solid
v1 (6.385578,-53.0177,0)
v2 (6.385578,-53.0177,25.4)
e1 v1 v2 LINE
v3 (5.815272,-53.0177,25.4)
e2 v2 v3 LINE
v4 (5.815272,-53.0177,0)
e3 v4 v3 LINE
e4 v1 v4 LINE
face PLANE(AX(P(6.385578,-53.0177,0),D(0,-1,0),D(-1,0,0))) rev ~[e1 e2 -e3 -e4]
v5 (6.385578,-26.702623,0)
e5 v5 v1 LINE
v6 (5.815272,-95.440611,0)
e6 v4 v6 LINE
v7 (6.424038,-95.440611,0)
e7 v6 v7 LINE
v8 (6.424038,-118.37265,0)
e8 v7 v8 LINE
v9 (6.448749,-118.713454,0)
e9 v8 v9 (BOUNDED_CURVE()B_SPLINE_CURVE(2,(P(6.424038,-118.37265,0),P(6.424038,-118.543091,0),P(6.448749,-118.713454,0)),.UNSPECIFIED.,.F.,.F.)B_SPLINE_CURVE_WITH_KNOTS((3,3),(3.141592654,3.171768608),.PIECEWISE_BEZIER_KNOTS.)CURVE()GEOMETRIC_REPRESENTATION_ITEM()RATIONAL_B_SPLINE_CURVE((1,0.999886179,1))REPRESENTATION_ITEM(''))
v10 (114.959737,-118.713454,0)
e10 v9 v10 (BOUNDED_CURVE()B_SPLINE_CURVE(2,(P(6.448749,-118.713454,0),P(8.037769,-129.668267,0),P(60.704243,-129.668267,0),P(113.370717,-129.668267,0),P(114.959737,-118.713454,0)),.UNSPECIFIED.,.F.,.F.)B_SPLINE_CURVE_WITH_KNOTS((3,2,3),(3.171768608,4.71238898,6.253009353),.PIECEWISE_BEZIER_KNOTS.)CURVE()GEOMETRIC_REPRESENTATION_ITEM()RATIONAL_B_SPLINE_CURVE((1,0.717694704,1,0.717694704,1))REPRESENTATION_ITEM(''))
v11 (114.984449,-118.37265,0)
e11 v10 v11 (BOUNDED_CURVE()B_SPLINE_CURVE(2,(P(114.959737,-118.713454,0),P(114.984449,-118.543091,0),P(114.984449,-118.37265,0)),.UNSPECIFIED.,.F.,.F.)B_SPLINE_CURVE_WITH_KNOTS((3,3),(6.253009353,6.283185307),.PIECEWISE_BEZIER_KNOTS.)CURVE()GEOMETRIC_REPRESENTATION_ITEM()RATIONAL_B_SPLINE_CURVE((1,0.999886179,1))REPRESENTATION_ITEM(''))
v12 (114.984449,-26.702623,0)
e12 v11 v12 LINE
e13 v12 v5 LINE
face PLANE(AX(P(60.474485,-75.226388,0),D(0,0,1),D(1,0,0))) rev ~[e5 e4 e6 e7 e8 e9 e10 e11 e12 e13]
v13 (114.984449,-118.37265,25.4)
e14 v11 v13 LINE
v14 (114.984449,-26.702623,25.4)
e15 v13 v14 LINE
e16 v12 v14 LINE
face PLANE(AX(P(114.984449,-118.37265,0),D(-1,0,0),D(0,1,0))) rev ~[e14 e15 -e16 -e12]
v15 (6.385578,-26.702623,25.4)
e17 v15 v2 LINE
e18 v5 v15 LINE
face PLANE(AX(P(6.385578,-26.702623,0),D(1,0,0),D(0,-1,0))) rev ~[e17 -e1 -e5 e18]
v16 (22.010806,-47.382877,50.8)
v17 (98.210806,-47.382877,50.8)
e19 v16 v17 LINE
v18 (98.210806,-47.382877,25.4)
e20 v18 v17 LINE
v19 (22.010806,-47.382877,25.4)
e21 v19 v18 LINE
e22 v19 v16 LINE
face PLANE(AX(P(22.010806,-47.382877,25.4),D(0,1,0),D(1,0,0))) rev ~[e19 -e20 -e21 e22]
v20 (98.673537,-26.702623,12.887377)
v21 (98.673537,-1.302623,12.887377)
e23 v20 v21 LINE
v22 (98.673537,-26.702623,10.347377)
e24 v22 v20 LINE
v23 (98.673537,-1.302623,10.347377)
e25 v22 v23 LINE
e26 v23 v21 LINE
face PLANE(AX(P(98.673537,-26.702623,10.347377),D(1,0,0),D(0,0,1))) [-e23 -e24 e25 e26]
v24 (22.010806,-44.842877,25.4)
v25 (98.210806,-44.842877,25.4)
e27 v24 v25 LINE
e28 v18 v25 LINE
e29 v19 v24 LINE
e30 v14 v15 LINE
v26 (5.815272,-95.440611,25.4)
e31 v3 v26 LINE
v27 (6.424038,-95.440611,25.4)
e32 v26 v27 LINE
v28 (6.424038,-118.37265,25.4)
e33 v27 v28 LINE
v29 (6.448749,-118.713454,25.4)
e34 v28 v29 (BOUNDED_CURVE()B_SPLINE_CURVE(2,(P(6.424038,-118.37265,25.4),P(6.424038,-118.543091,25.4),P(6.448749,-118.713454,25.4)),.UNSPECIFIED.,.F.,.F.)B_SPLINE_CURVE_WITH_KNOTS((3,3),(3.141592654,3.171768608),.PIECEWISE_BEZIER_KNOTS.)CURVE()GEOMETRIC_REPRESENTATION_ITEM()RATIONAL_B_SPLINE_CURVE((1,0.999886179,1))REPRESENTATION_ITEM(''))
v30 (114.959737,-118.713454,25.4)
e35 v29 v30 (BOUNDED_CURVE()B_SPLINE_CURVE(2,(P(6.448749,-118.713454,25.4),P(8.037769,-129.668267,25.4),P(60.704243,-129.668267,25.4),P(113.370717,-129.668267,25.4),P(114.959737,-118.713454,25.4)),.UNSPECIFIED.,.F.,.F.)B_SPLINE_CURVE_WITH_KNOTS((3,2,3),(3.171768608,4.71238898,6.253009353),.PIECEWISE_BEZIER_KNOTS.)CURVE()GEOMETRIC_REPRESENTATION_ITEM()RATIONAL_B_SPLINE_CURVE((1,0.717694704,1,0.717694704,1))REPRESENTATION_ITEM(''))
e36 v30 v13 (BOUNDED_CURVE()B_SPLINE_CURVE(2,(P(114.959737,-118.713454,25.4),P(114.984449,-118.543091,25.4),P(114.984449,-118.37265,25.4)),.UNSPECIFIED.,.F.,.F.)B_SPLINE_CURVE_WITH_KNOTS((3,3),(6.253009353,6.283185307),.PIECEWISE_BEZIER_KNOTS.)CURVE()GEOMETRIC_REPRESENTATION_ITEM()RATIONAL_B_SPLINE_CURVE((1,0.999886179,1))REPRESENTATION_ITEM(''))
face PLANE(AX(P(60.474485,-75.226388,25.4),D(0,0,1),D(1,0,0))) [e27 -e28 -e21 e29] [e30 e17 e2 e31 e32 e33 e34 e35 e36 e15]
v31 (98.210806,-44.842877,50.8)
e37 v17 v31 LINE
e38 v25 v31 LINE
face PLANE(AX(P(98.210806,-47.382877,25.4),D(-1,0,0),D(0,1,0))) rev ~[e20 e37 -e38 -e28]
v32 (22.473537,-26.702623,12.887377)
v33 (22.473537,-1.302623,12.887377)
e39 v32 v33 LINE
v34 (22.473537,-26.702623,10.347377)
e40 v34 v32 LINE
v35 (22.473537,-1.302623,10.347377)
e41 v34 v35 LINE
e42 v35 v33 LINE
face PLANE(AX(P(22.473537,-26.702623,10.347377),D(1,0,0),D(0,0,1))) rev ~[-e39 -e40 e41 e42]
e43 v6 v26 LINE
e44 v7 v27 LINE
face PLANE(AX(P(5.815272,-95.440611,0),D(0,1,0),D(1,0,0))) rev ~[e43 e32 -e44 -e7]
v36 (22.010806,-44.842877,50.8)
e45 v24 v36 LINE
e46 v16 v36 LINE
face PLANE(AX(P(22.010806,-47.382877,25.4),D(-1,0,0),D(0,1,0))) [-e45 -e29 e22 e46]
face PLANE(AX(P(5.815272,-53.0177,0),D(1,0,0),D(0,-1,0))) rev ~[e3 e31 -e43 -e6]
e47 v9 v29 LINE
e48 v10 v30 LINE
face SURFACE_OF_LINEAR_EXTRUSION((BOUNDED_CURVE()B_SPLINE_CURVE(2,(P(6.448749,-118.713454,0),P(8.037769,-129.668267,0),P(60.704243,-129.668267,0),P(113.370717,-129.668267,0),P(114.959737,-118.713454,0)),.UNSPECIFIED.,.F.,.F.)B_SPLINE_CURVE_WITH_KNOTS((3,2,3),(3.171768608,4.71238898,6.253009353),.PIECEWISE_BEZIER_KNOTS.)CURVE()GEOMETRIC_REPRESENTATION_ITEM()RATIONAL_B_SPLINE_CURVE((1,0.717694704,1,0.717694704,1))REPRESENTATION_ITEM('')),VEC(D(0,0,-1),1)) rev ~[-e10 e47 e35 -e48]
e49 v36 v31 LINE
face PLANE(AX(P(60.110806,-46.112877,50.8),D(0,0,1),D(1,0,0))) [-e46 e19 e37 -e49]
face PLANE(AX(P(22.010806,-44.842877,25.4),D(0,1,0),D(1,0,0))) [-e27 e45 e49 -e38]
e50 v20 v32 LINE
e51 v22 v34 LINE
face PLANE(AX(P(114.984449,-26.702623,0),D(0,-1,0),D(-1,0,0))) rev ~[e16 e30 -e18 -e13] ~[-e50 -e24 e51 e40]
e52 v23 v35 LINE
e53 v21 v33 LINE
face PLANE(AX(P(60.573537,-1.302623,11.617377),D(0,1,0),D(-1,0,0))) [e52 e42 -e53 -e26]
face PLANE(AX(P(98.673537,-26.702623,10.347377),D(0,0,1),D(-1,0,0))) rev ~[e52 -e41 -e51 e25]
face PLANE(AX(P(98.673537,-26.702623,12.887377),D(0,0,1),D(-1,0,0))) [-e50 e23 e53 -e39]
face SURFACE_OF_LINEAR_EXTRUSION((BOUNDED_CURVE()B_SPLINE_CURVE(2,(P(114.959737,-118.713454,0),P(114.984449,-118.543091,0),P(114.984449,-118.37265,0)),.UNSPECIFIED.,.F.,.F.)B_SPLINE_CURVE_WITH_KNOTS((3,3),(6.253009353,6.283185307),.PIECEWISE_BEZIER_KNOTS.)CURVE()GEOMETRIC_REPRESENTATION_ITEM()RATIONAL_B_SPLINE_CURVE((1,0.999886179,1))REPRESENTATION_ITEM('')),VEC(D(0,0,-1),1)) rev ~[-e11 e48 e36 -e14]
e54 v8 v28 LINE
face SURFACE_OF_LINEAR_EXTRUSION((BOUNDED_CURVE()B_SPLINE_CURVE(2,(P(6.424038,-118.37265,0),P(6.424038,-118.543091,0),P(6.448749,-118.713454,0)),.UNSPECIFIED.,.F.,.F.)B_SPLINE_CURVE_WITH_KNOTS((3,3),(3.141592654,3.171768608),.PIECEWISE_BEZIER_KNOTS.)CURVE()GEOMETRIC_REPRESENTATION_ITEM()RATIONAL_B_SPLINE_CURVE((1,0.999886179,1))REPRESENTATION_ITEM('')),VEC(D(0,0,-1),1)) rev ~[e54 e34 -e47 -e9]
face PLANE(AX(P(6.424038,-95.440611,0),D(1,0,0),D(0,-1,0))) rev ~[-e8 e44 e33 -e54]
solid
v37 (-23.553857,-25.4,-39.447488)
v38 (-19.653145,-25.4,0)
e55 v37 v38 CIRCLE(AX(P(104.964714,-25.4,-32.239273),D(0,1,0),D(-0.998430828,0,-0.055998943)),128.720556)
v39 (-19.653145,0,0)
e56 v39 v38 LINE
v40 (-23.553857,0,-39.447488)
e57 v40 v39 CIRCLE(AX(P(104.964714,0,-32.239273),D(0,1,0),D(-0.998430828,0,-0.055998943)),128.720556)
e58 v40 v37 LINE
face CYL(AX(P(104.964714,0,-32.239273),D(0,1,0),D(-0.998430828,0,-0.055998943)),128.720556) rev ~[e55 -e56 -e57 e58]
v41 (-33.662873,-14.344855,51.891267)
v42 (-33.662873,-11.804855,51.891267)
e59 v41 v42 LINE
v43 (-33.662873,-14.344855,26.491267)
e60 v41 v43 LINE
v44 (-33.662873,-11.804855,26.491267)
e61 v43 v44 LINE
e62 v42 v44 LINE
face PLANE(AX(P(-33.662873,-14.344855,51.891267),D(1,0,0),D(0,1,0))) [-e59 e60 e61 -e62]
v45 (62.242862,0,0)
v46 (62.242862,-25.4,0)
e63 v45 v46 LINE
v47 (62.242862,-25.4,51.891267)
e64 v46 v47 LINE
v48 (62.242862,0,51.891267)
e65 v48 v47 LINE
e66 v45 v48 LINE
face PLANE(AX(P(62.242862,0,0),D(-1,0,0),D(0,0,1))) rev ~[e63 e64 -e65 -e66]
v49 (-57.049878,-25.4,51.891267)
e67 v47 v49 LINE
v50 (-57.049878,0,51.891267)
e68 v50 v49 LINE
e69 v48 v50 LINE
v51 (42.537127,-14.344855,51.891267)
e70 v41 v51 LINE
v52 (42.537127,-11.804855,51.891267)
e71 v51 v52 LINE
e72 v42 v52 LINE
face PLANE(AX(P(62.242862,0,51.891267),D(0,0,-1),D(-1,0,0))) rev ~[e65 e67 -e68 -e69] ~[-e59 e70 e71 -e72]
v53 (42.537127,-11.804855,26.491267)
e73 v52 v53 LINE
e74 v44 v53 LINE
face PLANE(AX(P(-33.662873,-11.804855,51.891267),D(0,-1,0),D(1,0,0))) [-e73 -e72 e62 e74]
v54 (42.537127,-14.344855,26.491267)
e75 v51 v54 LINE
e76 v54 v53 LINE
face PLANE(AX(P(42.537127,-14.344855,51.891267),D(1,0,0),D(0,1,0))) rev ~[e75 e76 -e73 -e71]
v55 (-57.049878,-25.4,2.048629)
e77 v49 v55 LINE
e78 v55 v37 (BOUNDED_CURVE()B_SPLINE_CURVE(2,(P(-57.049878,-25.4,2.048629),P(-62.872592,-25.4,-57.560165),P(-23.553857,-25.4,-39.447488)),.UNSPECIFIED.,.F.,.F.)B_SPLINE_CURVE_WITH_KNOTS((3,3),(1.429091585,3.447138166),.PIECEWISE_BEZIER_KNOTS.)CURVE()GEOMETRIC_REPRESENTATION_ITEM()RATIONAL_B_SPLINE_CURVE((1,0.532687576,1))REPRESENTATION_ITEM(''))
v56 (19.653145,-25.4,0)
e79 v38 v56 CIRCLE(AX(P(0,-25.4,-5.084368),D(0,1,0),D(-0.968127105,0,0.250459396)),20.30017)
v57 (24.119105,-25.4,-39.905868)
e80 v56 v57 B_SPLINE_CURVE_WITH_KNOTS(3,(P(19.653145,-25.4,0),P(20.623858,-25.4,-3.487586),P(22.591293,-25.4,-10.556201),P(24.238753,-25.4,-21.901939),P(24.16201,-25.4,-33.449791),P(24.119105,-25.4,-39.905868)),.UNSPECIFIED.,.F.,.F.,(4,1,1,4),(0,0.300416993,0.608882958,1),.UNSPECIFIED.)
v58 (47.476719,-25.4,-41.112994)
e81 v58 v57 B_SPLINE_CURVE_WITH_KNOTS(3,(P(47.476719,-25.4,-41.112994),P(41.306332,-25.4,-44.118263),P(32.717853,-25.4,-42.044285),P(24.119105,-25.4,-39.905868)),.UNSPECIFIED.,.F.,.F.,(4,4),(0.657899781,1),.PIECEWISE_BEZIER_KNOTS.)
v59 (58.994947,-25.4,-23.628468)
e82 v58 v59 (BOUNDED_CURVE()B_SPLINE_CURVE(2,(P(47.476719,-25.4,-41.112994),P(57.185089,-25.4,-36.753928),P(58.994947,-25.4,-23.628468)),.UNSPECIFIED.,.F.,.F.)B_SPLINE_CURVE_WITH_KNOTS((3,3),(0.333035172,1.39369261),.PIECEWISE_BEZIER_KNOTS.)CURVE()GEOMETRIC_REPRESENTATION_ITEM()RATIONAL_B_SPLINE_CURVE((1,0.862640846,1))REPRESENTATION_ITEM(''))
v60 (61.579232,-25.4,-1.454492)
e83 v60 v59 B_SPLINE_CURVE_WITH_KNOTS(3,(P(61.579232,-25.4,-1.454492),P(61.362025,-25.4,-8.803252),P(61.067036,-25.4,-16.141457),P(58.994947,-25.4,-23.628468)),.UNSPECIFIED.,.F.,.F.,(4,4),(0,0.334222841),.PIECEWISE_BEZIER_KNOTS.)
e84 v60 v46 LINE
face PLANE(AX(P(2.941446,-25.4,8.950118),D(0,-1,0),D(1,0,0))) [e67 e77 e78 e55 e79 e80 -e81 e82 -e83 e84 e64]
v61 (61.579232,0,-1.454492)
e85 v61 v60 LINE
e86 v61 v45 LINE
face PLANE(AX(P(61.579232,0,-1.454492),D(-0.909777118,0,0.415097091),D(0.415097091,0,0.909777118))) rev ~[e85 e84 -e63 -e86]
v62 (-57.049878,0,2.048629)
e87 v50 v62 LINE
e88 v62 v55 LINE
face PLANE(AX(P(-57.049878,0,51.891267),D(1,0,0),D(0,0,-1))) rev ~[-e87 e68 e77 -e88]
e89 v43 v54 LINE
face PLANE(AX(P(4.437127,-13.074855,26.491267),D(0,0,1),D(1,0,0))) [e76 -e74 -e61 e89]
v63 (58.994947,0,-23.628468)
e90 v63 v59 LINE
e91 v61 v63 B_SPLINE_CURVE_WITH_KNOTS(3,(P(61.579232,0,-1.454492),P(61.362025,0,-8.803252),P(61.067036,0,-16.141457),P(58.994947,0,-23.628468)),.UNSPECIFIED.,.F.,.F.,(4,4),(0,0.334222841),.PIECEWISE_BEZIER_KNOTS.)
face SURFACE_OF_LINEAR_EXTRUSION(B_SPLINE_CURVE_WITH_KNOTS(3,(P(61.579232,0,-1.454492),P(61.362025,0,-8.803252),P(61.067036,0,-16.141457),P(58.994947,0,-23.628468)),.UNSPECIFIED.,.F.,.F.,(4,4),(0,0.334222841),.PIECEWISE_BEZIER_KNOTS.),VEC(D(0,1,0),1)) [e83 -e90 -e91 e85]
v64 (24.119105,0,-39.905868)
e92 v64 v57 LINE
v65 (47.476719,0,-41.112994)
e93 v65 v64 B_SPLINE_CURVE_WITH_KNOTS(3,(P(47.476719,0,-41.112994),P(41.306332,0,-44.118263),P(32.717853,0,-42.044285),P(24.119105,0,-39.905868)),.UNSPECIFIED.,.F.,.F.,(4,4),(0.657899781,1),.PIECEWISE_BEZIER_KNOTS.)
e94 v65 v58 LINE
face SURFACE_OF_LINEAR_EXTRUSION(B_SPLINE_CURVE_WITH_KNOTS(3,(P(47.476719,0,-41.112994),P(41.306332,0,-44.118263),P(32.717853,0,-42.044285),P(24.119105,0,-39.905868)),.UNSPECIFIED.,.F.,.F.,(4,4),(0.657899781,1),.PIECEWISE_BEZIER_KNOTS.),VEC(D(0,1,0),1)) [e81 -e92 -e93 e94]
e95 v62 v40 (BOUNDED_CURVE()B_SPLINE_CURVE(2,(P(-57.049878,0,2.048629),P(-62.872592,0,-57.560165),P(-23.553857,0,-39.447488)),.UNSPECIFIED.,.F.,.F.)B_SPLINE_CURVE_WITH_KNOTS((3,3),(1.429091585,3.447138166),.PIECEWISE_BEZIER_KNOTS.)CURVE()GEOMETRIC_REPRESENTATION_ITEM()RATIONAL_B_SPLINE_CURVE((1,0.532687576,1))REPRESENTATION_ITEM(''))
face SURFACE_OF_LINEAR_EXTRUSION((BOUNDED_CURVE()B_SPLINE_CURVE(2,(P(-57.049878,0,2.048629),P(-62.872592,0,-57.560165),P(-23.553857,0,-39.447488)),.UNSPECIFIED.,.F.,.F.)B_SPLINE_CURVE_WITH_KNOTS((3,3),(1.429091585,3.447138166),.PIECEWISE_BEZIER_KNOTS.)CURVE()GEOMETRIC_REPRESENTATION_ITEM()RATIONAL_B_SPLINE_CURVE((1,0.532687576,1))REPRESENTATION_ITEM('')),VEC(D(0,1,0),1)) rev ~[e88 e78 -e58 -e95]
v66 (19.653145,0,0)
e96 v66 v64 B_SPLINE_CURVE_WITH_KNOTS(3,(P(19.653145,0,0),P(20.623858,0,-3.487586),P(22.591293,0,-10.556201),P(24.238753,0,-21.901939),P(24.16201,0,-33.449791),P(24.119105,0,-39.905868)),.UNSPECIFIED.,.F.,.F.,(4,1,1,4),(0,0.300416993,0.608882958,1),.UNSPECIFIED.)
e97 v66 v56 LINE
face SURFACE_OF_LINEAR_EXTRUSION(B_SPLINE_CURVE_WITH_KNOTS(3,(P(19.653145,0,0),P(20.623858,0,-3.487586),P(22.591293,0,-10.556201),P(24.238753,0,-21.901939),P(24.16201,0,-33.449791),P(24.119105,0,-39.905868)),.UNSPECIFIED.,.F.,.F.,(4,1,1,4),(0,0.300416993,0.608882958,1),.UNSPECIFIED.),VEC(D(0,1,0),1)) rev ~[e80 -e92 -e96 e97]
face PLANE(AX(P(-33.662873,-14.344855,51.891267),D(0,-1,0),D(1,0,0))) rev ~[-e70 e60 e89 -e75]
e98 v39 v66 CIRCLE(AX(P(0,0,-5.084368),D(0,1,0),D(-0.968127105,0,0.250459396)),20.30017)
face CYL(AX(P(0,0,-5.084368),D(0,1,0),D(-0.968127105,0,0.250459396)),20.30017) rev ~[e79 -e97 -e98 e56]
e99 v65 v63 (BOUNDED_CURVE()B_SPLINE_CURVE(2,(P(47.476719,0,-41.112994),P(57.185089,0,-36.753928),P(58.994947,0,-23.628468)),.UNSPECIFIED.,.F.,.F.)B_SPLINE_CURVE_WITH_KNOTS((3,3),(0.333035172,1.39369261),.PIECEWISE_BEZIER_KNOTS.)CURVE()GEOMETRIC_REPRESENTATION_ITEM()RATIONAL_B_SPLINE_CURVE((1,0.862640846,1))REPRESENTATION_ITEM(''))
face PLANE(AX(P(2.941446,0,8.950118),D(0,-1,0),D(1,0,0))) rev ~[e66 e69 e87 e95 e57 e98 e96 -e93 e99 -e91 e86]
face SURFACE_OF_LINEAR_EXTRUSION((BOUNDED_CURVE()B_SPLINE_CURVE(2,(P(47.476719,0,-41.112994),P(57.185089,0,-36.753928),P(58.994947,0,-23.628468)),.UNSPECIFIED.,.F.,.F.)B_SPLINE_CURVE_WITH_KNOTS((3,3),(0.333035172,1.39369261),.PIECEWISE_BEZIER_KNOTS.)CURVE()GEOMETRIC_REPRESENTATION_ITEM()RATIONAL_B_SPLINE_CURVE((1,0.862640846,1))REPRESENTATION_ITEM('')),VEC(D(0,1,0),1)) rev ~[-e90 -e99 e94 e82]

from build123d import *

# Parameters (mm, degrees)
F1_DEPTH = 25.4
F2_W     = 76.2
F2_H     = 2.54
F3_DEPTH = 25.4
F5_DEPTH = 25.4
F6_W     = 76.2
F6_H     = 2.54
F7_DEPTH = 25.4
F8_W     = 76.2
F8_H     = 2.54
F9_DEPTH = 25.4


with BuildPart() as f1:
    # F0 (on Front) → F1 (new body)
    with BuildSketch(Plane.XZ):
        with BuildLine():
            Line((62.2428618371, 51.8912672997), (-57.0498779416, 51.8912672997))
            Line((-57.0498779416, 51.8912672997), (-57.0498779416, 2.0486290034))
            add(Edge.make_bspline(
                [(-57.0498779416, 2.0486290034), (-62.8725917554, -57.5601651506), (-23.5538572735, -39.4474879084)],
                knots=[1.4290915848, 1.4290915848, 1.4290915848, 3.4471381657, 3.4471381657, 3.4471381657], degree=2, weights=[1, 0.5326875763, 1]))
            ThreePointArc((-23.5538572735, -39.4474879084), (-23.1311062984, -19.5726887681), (-19.6531451654, 0))
            ThreePointArc((-19.6531451654, 0), (0, 15.2158019665), (19.6531451654, 0))
            add(Edge.make_bspline(
                [(19.6531451654, 0), (20.6238584336, -3.4875863708), (22.5912929652, -10.5562008448), (24.2387527598, -21.9019388925), (24.1620099315, -33.4497913044), (24.11910519, -39.9058684707)],
                knots=[0, 0, 0, 0, 0.3004169931, 0.608882958, 1, 1, 1, 1], degree=3))
            add(Edge.make_bspline(
                [(47.476719356, -41.1129942258), (41.3063324166, -44.1182628579), (32.717853118, -42.0442846037), (24.11910519, -39.9058684707)],
                knots=[0.6578997811, 0.6578997811, 0.6578997811, 0.6578997811, 1, 1, 1, 1], degree=3))
            add(Edge.make_bspline(
                [(58.9949473098, -23.6284681863), (56.9882398729, -30.879237475), (53.3148096325, -38.2695696963), (47.476719356, -41.1129942258)],
                knots=[0.3342228414, 0.3342228414, 0.3342228414, 0.3342228414, 0.6578997811, 0.6578997811, 0.6578997811, 0.6578997811], degree=3))
            add(Edge.make_bspline(
                [(61.5792318695, -1.454491908), (61.36202452, -8.8032522142), (61.0670364179, -16.1414574779), (58.9949473098, -23.6284681863)],
                knots=[0, 0, 0, 0, 0.3342228414, 0.3342228414, 0.3342228414, 0.3342228414], degree=3))
            Line((61.5792318695, -1.454491908), (62.2428618371, 0))
            Line((62.2428618371, 0), (62.2428618371, 51.8912672997))
        make_face()
        with BuildLine():
            add(Edge.make_bspline(
                [(47.476719356, -41.1129942258), (57.185089489, -36.7539276341), (58.9949473098, -23.6284681863)],
                knots=[0.3330351725, 0.3330351725, 0.3330351725, 1.3936926102, 1.3936926102, 1.3936926102], degree=2, weights=[1, 0.8626408456, 1]))
            add(Edge.make_bspline(
                [(58.9949473098, -23.6284681863), (56.9882398729, -30.879237475), (53.3148096325, -38.2695696963), (47.476719356, -41.1129942258)],
                knots=[0.3342228414, 0.3342228414, 0.3342228414, 0.3342228414, 0.6578997811, 0.6578997811, 0.6578997811, 0.6578997811], degree=3))
        make_face()
    extrude(amount=F1_DEPTH)

    # F2 (on face) → F3 (cut)
    with BuildSketch(Plane.XY.offset(51.8912672997)):
        with Locations((4.4371271506, -13.0748547494)):
            Rectangle(F2_W, F2_H)
    extrude(amount=-F3_DEPTH, mode=Mode.SUBTRACT)


with BuildPart() as f5:
    # F4 (on Top) → F5 (new body)
    with BuildSketch(Plane.XY):
        with BuildLine():
            Line((6.4240375055, -95.4406112065), (6.4240375055, -118.3726499874))
            add(Edge.make_bspline(
                [(6.4240375055, -118.3726499874), (6.4240375055, -118.5430909379), (6.4487490888, -118.7134542936)],
                knots=[3.1415926536, 3.1415926536, 3.1415926536, 3.1717686083, 3.1717686083, 3.1717686083], degree=2, weights=[1, 0.9998861786, 1]))
            add(Edge.make_bspline(
                [(6.4487490888, -118.7134542936), (8.0377690426, -129.6682672247), (60.7042431856, -129.6682672247), (113.3707173286, -129.6682672247), (114.9597372824, -118.7134542936)],
                knots=[3.1717686083, 3.1717686083, 3.1717686083, 4.7123889804, 4.7123889804, 6.2530093525, 6.2530093525, 6.2530093525], degree=2, weights=[1, 0.7176947036, 1, 0.7176947036, 1]))
            add(Edge.make_bspline(
                [(114.9597372824, -118.7134542936), (114.9844488657, -118.5430909379), (114.9844488657, -118.3726499874)],
                knots=[6.2530093525, 6.2530093525, 6.2530093525, 6.2831853072, 6.2831853072, 6.2831853072], degree=2, weights=[1, 0.9998861786, 1]))
            Line((114.9844488657, -118.3726499874), (114.9844488657, -95.4406112065))
            Line((114.9844488657, -95.4406112065), (114.9844488657, -53.0177001276))
            Line((114.9844488657, -53.0177001276), (114.9844488657, -26.7026225953))
            Line((114.9844488657, -26.7026225953), (6.38557814, -26.7026225953))
            Line((6.38557814, -26.7026225953), (6.38557814, -53.0177001276))
            Line((6.38557814, -53.0177001276), (5.8152723915, -53.0177001276))
            Line((5.8152723915, -53.0177001276), (5.8152723915, -95.4406112065))
            Line((5.8152723915, -95.4406112065), (6.4240375055, -95.4406112065))
        make_face()
    extrude(amount=F5_DEPTH)

    # F6 (on face) → F7 (join)
    with BuildSketch(Plane.XY.offset(25.4)):
        with Locations((60.1108064875, -46.1128767049)):
            Rectangle(F6_W, F6_H)
    extrude(amount=F7_DEPTH)

    # F8 (on face) → F9 (join)
    with BuildSketch(Plane(origin=(0, -26.7026225953, 0), x_dir=(-1, 0, 0), z_dir=(0, 1, 0))):
        with Locations((-60.5735373735, 11.6173765776)):
            Rectangle(F8_W, F8_H)
    extrude(amount=F9_DEPTH)


solid = Compound([f1.part, f5.part])
